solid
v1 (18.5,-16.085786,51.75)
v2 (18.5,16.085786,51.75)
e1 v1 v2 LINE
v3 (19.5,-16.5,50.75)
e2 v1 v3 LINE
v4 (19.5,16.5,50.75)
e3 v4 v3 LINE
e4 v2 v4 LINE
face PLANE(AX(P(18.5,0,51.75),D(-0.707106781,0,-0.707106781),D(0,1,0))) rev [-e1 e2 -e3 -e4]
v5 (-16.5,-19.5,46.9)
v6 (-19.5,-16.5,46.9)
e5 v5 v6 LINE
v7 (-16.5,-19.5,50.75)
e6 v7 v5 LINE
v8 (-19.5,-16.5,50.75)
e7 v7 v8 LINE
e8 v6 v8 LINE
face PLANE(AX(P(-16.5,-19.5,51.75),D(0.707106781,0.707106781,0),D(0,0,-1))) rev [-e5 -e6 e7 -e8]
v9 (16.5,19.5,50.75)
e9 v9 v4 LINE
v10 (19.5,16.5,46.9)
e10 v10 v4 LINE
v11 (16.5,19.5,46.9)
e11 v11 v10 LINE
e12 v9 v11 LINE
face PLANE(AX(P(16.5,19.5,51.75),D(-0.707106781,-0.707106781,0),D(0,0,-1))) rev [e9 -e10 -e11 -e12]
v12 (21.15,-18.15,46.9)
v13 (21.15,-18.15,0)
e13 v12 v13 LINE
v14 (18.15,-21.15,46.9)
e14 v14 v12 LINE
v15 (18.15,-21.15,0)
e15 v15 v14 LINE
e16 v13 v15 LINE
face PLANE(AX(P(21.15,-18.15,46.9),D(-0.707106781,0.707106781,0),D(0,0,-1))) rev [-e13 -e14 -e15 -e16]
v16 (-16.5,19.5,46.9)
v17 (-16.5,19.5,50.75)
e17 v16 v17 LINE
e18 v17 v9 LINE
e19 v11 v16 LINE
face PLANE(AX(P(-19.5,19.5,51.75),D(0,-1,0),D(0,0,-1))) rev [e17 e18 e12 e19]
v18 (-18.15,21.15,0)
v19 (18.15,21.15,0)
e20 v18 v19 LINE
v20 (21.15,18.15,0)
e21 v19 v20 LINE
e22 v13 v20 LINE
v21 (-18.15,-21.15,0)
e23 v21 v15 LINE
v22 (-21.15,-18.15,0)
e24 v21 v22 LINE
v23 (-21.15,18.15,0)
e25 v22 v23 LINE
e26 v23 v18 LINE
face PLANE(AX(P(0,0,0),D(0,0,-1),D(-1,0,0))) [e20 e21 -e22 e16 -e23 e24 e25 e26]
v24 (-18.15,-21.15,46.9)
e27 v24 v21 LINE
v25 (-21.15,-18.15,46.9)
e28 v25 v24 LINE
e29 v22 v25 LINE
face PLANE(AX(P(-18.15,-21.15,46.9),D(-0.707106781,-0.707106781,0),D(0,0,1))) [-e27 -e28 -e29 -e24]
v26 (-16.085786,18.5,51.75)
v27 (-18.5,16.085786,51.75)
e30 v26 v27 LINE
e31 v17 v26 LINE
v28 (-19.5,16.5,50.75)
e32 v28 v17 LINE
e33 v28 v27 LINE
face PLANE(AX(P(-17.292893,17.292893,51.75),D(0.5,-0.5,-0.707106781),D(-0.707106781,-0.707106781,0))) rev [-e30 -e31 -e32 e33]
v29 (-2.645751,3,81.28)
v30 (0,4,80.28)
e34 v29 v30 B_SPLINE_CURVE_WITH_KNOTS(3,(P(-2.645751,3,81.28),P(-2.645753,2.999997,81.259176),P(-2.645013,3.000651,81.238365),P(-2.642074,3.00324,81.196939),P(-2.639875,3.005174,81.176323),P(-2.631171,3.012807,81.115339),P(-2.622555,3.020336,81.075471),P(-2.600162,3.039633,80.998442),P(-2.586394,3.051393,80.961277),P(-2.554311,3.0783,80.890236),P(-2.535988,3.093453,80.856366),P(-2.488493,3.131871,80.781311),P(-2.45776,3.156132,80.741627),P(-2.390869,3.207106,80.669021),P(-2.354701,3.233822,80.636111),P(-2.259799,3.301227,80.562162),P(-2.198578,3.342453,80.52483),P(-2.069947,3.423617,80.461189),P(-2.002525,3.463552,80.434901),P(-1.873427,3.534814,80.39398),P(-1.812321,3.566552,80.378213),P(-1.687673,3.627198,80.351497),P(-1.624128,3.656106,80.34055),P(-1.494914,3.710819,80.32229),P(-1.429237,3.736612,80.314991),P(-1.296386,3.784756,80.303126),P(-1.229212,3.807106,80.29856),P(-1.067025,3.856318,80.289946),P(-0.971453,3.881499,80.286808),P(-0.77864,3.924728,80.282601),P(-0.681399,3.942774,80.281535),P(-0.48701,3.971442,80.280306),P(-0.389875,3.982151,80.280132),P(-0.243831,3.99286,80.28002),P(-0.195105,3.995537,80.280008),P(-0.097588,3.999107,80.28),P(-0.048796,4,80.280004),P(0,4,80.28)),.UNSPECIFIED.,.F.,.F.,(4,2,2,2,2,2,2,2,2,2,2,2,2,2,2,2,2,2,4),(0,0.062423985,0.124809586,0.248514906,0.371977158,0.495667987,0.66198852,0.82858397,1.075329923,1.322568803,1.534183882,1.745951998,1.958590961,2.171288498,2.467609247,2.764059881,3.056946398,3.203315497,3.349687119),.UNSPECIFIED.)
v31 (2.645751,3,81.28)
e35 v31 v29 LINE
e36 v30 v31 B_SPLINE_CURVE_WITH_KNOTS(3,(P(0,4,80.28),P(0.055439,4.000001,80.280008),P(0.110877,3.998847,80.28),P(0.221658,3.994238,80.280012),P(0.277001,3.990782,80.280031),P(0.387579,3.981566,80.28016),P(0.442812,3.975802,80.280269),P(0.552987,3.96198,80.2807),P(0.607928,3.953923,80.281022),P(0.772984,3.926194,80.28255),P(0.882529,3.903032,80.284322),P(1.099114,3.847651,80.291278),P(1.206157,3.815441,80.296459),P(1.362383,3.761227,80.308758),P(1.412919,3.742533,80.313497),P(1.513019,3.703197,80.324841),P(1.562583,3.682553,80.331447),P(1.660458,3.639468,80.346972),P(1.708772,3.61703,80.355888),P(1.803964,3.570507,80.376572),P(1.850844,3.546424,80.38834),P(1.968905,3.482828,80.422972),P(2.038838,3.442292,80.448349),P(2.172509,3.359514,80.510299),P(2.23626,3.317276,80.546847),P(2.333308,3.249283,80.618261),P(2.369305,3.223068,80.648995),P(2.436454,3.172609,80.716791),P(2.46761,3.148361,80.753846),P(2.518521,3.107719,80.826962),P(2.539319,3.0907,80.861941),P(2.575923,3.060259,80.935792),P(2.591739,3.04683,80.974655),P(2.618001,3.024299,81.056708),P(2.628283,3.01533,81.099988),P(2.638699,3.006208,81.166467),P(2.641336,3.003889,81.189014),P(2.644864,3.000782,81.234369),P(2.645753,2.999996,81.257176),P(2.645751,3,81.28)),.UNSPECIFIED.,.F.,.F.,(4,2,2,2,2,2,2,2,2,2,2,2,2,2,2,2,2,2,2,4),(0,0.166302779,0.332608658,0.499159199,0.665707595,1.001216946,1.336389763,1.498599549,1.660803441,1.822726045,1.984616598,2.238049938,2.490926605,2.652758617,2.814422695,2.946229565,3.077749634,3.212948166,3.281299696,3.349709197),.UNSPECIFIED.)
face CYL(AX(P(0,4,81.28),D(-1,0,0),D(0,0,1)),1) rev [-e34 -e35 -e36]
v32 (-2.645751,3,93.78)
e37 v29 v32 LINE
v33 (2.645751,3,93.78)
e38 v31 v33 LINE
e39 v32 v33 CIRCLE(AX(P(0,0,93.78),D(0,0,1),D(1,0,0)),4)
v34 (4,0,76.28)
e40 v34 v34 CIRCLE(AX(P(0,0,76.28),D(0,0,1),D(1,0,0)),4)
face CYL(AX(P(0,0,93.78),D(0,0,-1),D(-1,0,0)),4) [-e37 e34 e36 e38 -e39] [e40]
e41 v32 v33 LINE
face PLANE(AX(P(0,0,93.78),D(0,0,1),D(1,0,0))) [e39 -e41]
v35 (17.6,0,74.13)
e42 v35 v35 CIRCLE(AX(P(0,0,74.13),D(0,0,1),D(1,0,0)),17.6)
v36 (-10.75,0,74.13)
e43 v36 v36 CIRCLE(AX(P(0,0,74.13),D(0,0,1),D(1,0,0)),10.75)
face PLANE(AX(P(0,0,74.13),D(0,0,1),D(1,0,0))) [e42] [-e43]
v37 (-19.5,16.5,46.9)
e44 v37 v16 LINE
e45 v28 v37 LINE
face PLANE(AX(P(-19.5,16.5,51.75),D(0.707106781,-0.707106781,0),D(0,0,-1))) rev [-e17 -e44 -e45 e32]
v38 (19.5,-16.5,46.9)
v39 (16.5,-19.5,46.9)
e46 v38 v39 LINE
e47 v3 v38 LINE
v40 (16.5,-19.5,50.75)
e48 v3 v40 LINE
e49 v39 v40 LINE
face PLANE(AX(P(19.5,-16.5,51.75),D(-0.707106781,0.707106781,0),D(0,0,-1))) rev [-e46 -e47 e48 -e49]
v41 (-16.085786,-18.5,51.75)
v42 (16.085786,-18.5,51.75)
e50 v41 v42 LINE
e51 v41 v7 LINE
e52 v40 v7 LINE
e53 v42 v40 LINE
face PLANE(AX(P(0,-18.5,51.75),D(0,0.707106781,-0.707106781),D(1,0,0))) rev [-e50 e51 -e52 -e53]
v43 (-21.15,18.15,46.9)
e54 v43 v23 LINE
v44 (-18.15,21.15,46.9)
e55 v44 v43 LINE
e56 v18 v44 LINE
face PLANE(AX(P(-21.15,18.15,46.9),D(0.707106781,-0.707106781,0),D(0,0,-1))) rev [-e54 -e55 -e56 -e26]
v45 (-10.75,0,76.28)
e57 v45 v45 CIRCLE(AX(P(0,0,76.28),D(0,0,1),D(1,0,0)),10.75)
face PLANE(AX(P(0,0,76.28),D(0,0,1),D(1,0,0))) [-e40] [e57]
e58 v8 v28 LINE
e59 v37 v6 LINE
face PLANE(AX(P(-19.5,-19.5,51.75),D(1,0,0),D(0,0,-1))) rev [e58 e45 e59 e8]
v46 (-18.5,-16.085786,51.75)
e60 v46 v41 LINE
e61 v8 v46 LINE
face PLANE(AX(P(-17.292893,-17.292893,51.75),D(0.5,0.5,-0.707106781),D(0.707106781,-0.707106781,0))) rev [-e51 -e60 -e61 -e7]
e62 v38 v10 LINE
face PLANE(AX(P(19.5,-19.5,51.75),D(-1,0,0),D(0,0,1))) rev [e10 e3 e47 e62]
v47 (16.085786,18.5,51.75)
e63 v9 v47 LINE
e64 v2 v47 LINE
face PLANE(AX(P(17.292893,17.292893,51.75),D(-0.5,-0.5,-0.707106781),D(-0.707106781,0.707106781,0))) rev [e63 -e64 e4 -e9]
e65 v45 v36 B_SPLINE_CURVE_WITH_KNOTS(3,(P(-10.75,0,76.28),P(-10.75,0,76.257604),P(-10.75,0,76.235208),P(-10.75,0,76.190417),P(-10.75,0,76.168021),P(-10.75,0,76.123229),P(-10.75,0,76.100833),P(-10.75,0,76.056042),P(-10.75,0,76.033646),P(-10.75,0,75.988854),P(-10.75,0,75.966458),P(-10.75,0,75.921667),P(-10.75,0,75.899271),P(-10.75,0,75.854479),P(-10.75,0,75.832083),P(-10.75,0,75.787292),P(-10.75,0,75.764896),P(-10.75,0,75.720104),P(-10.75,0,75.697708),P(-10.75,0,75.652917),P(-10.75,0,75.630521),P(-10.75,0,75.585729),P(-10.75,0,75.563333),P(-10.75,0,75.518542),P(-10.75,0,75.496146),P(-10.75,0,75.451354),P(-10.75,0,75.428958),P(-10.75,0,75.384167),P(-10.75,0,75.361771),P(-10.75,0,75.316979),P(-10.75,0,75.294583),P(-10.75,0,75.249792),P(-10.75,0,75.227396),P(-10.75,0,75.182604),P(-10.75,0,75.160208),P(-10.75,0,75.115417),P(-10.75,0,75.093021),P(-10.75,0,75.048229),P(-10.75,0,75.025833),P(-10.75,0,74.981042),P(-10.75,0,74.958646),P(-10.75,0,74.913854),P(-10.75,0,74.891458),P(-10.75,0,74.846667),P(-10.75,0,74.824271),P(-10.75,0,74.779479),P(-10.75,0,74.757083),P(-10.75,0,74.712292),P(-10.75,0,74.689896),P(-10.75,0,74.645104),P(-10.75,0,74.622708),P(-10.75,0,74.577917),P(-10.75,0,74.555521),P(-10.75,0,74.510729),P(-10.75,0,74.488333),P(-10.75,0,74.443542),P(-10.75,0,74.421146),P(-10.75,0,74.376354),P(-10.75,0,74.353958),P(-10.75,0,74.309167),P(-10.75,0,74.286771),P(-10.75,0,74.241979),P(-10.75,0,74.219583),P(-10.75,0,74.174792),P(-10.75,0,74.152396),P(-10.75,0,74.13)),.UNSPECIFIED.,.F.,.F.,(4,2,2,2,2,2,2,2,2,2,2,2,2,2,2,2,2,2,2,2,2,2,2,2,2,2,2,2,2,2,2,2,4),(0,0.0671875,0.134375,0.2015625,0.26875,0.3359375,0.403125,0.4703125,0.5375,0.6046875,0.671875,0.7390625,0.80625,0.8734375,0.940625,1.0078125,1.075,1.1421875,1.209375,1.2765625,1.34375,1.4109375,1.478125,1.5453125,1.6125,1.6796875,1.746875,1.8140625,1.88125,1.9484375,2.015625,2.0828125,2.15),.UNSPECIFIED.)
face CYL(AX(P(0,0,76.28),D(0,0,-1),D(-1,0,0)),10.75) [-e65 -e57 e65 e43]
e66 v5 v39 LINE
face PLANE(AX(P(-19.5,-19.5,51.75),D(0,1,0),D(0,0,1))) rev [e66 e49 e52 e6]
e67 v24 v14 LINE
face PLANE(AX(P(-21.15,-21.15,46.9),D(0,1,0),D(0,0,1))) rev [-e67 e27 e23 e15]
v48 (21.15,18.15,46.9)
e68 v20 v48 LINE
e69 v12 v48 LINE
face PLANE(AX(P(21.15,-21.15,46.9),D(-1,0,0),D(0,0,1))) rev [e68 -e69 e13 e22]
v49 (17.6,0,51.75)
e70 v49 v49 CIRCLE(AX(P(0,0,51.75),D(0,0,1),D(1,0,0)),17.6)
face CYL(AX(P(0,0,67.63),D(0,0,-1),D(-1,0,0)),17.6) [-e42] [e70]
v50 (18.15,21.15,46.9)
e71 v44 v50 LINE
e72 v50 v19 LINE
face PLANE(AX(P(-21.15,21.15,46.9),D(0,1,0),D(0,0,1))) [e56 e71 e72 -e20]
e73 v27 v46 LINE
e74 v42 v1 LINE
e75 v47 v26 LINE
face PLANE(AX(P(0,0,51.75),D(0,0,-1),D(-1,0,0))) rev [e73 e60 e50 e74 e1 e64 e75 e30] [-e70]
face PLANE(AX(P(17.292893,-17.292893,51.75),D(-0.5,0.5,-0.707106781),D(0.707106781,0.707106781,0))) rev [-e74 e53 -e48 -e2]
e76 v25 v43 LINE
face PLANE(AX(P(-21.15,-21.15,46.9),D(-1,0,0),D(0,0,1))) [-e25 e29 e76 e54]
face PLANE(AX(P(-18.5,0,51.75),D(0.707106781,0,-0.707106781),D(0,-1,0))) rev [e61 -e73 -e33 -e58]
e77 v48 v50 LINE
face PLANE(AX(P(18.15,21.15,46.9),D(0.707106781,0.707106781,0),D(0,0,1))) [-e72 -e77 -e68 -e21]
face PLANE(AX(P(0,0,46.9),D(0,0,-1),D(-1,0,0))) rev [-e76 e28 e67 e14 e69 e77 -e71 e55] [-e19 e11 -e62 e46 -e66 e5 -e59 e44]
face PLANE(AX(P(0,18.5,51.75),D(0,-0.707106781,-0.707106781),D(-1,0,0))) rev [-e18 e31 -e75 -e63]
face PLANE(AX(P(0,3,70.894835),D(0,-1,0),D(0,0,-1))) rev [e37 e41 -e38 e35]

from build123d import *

# Parameters (mm, degrees)
SKETCH1_W           = 42.3
SKETCH1_H           = 42.3
BOSS_EXTRUDE1_DEPTH = 46.9
SKETCH2_W           = 39
SKETCH2_H           = 39
BOSS_EXTRUDE2_DEPTH = 4.85
SKETCH3_R           = 17.6
BOSS_EXTRUDE3_DEPTH = 15.88
SKETCH4_R           = 17.6
BOSS_EXTRUDE4_DEPTH = 6.5
SKETCH5_R           = 10.75
BOSS_EXTRUDE5_DEPTH = 2.15
SKETCH6_R           = 4
BOSS_EXTRUDE6_DEPTH = 17.5
CUT_EXTRUDE1_DEPTH  = 13.5
CHAMFER1_SIZE       = 3
CHAMFER2_SIZE       = 1
FILLET1_R           = 1


with BuildPart() as part:
    # Sketch1 → Boss-Extrude1 (new body)
    with BuildSketch(Plane.XY):
        Rectangle(SKETCH1_W, SKETCH1_H)
    extrude(amount=BOSS_EXTRUDE1_DEPTH)

    # Sketch2 → Boss-Extrude2 (add)
    with BuildSketch(Plane.XY.offset(46.9)):
        Rectangle(SKETCH2_W, SKETCH2_H)
    extrude(amount=BOSS_EXTRUDE2_DEPTH)

    # Sketch3 → Boss-Extrude3 (add)
    with BuildSketch(Plane.XY.offset(51.75)):
        Circle(SKETCH3_R)
    extrude(amount=BOSS_EXTRUDE3_DEPTH)

    # Sketch4 → Boss-Extrude4 (add)
    with BuildSketch(Plane.XY.offset(67.63)):
        Circle(SKETCH4_R)
    extrude(amount=BOSS_EXTRUDE4_DEPTH)

    # Sketch5 → Boss-Extrude5 (add)
    with BuildSketch(Plane.XY.offset(74.13)):
        with Locations(Location((0, 0, 0), (0, 0, 180))):
            Circle(SKETCH5_R)
    extrude(amount=BOSS_EXTRUDE5_DEPTH)

    # Sketch6 → Boss-Extrude6 (add)
    with BuildSketch(Plane.XY.offset(76.28)):
        Circle(SKETCH6_R)
    extrude(amount=BOSS_EXTRUDE6_DEPTH)

    # Sketch7 → Cut-Extrude1 (cut)
    with BuildSketch(Plane.XY.offset(93.78)):
        Polygon((-80.453133814, 3), (-2.645751311, 3), (2.645751311, 3), (80.453133814, 3), (80.453133814, 158.614765005), (-80.453133814, 158.614765005), align=None)
    extrude(amount=-CUT_EXTRUDE1_DEPTH, mode=Mode.SUBTRACT)

    # Chamfer1
    chamfer1_edges = [part.edges().sort_by_distance(p)[0] for p in [
        (19.5, -19.5, 49.325),
        (19.5, 19.5, 49.325),
        (-19.5, 19.5, 49.325),
        (-19.5, -19.5, 49.325),
        (-21.15, -21.15, 23.45),
        (21.15, -21.15, 23.45),
        (21.15, 21.15, 23.45),
        (-21.15, 21.15, 23.45),
    ]]
    chamfer(chamfer1_edges, length=CHAMFER1_SIZE)

    # Chamfer2
    chamfer2_edges = [part.edges().sort_by_distance(p)[0] for p in [
        (-19.5, 0, 51.75),
        (0, 19.5, 51.75),
        (19.5, 0, 51.75),
        (0, -19.5, 51.75),
        (18, 18, 51.75),
        (18, -18, 51.75),
        (-18, -18, 51.75),
        (-18, 18, 51.75),
    ]]
    chamfer(chamfer2_edges, length=CHAMFER2_SIZE)

    # Fillet1
    fillet1_edges = [part.edges().sort_by_distance(p)[0] for p in [
        (0, 3, 80.28),
    ]]
    fillet(fillet1_edges, radius=FILLET1_R - 0.0001)  # a hair under: the kernel refuses the full size


solid = part.part
